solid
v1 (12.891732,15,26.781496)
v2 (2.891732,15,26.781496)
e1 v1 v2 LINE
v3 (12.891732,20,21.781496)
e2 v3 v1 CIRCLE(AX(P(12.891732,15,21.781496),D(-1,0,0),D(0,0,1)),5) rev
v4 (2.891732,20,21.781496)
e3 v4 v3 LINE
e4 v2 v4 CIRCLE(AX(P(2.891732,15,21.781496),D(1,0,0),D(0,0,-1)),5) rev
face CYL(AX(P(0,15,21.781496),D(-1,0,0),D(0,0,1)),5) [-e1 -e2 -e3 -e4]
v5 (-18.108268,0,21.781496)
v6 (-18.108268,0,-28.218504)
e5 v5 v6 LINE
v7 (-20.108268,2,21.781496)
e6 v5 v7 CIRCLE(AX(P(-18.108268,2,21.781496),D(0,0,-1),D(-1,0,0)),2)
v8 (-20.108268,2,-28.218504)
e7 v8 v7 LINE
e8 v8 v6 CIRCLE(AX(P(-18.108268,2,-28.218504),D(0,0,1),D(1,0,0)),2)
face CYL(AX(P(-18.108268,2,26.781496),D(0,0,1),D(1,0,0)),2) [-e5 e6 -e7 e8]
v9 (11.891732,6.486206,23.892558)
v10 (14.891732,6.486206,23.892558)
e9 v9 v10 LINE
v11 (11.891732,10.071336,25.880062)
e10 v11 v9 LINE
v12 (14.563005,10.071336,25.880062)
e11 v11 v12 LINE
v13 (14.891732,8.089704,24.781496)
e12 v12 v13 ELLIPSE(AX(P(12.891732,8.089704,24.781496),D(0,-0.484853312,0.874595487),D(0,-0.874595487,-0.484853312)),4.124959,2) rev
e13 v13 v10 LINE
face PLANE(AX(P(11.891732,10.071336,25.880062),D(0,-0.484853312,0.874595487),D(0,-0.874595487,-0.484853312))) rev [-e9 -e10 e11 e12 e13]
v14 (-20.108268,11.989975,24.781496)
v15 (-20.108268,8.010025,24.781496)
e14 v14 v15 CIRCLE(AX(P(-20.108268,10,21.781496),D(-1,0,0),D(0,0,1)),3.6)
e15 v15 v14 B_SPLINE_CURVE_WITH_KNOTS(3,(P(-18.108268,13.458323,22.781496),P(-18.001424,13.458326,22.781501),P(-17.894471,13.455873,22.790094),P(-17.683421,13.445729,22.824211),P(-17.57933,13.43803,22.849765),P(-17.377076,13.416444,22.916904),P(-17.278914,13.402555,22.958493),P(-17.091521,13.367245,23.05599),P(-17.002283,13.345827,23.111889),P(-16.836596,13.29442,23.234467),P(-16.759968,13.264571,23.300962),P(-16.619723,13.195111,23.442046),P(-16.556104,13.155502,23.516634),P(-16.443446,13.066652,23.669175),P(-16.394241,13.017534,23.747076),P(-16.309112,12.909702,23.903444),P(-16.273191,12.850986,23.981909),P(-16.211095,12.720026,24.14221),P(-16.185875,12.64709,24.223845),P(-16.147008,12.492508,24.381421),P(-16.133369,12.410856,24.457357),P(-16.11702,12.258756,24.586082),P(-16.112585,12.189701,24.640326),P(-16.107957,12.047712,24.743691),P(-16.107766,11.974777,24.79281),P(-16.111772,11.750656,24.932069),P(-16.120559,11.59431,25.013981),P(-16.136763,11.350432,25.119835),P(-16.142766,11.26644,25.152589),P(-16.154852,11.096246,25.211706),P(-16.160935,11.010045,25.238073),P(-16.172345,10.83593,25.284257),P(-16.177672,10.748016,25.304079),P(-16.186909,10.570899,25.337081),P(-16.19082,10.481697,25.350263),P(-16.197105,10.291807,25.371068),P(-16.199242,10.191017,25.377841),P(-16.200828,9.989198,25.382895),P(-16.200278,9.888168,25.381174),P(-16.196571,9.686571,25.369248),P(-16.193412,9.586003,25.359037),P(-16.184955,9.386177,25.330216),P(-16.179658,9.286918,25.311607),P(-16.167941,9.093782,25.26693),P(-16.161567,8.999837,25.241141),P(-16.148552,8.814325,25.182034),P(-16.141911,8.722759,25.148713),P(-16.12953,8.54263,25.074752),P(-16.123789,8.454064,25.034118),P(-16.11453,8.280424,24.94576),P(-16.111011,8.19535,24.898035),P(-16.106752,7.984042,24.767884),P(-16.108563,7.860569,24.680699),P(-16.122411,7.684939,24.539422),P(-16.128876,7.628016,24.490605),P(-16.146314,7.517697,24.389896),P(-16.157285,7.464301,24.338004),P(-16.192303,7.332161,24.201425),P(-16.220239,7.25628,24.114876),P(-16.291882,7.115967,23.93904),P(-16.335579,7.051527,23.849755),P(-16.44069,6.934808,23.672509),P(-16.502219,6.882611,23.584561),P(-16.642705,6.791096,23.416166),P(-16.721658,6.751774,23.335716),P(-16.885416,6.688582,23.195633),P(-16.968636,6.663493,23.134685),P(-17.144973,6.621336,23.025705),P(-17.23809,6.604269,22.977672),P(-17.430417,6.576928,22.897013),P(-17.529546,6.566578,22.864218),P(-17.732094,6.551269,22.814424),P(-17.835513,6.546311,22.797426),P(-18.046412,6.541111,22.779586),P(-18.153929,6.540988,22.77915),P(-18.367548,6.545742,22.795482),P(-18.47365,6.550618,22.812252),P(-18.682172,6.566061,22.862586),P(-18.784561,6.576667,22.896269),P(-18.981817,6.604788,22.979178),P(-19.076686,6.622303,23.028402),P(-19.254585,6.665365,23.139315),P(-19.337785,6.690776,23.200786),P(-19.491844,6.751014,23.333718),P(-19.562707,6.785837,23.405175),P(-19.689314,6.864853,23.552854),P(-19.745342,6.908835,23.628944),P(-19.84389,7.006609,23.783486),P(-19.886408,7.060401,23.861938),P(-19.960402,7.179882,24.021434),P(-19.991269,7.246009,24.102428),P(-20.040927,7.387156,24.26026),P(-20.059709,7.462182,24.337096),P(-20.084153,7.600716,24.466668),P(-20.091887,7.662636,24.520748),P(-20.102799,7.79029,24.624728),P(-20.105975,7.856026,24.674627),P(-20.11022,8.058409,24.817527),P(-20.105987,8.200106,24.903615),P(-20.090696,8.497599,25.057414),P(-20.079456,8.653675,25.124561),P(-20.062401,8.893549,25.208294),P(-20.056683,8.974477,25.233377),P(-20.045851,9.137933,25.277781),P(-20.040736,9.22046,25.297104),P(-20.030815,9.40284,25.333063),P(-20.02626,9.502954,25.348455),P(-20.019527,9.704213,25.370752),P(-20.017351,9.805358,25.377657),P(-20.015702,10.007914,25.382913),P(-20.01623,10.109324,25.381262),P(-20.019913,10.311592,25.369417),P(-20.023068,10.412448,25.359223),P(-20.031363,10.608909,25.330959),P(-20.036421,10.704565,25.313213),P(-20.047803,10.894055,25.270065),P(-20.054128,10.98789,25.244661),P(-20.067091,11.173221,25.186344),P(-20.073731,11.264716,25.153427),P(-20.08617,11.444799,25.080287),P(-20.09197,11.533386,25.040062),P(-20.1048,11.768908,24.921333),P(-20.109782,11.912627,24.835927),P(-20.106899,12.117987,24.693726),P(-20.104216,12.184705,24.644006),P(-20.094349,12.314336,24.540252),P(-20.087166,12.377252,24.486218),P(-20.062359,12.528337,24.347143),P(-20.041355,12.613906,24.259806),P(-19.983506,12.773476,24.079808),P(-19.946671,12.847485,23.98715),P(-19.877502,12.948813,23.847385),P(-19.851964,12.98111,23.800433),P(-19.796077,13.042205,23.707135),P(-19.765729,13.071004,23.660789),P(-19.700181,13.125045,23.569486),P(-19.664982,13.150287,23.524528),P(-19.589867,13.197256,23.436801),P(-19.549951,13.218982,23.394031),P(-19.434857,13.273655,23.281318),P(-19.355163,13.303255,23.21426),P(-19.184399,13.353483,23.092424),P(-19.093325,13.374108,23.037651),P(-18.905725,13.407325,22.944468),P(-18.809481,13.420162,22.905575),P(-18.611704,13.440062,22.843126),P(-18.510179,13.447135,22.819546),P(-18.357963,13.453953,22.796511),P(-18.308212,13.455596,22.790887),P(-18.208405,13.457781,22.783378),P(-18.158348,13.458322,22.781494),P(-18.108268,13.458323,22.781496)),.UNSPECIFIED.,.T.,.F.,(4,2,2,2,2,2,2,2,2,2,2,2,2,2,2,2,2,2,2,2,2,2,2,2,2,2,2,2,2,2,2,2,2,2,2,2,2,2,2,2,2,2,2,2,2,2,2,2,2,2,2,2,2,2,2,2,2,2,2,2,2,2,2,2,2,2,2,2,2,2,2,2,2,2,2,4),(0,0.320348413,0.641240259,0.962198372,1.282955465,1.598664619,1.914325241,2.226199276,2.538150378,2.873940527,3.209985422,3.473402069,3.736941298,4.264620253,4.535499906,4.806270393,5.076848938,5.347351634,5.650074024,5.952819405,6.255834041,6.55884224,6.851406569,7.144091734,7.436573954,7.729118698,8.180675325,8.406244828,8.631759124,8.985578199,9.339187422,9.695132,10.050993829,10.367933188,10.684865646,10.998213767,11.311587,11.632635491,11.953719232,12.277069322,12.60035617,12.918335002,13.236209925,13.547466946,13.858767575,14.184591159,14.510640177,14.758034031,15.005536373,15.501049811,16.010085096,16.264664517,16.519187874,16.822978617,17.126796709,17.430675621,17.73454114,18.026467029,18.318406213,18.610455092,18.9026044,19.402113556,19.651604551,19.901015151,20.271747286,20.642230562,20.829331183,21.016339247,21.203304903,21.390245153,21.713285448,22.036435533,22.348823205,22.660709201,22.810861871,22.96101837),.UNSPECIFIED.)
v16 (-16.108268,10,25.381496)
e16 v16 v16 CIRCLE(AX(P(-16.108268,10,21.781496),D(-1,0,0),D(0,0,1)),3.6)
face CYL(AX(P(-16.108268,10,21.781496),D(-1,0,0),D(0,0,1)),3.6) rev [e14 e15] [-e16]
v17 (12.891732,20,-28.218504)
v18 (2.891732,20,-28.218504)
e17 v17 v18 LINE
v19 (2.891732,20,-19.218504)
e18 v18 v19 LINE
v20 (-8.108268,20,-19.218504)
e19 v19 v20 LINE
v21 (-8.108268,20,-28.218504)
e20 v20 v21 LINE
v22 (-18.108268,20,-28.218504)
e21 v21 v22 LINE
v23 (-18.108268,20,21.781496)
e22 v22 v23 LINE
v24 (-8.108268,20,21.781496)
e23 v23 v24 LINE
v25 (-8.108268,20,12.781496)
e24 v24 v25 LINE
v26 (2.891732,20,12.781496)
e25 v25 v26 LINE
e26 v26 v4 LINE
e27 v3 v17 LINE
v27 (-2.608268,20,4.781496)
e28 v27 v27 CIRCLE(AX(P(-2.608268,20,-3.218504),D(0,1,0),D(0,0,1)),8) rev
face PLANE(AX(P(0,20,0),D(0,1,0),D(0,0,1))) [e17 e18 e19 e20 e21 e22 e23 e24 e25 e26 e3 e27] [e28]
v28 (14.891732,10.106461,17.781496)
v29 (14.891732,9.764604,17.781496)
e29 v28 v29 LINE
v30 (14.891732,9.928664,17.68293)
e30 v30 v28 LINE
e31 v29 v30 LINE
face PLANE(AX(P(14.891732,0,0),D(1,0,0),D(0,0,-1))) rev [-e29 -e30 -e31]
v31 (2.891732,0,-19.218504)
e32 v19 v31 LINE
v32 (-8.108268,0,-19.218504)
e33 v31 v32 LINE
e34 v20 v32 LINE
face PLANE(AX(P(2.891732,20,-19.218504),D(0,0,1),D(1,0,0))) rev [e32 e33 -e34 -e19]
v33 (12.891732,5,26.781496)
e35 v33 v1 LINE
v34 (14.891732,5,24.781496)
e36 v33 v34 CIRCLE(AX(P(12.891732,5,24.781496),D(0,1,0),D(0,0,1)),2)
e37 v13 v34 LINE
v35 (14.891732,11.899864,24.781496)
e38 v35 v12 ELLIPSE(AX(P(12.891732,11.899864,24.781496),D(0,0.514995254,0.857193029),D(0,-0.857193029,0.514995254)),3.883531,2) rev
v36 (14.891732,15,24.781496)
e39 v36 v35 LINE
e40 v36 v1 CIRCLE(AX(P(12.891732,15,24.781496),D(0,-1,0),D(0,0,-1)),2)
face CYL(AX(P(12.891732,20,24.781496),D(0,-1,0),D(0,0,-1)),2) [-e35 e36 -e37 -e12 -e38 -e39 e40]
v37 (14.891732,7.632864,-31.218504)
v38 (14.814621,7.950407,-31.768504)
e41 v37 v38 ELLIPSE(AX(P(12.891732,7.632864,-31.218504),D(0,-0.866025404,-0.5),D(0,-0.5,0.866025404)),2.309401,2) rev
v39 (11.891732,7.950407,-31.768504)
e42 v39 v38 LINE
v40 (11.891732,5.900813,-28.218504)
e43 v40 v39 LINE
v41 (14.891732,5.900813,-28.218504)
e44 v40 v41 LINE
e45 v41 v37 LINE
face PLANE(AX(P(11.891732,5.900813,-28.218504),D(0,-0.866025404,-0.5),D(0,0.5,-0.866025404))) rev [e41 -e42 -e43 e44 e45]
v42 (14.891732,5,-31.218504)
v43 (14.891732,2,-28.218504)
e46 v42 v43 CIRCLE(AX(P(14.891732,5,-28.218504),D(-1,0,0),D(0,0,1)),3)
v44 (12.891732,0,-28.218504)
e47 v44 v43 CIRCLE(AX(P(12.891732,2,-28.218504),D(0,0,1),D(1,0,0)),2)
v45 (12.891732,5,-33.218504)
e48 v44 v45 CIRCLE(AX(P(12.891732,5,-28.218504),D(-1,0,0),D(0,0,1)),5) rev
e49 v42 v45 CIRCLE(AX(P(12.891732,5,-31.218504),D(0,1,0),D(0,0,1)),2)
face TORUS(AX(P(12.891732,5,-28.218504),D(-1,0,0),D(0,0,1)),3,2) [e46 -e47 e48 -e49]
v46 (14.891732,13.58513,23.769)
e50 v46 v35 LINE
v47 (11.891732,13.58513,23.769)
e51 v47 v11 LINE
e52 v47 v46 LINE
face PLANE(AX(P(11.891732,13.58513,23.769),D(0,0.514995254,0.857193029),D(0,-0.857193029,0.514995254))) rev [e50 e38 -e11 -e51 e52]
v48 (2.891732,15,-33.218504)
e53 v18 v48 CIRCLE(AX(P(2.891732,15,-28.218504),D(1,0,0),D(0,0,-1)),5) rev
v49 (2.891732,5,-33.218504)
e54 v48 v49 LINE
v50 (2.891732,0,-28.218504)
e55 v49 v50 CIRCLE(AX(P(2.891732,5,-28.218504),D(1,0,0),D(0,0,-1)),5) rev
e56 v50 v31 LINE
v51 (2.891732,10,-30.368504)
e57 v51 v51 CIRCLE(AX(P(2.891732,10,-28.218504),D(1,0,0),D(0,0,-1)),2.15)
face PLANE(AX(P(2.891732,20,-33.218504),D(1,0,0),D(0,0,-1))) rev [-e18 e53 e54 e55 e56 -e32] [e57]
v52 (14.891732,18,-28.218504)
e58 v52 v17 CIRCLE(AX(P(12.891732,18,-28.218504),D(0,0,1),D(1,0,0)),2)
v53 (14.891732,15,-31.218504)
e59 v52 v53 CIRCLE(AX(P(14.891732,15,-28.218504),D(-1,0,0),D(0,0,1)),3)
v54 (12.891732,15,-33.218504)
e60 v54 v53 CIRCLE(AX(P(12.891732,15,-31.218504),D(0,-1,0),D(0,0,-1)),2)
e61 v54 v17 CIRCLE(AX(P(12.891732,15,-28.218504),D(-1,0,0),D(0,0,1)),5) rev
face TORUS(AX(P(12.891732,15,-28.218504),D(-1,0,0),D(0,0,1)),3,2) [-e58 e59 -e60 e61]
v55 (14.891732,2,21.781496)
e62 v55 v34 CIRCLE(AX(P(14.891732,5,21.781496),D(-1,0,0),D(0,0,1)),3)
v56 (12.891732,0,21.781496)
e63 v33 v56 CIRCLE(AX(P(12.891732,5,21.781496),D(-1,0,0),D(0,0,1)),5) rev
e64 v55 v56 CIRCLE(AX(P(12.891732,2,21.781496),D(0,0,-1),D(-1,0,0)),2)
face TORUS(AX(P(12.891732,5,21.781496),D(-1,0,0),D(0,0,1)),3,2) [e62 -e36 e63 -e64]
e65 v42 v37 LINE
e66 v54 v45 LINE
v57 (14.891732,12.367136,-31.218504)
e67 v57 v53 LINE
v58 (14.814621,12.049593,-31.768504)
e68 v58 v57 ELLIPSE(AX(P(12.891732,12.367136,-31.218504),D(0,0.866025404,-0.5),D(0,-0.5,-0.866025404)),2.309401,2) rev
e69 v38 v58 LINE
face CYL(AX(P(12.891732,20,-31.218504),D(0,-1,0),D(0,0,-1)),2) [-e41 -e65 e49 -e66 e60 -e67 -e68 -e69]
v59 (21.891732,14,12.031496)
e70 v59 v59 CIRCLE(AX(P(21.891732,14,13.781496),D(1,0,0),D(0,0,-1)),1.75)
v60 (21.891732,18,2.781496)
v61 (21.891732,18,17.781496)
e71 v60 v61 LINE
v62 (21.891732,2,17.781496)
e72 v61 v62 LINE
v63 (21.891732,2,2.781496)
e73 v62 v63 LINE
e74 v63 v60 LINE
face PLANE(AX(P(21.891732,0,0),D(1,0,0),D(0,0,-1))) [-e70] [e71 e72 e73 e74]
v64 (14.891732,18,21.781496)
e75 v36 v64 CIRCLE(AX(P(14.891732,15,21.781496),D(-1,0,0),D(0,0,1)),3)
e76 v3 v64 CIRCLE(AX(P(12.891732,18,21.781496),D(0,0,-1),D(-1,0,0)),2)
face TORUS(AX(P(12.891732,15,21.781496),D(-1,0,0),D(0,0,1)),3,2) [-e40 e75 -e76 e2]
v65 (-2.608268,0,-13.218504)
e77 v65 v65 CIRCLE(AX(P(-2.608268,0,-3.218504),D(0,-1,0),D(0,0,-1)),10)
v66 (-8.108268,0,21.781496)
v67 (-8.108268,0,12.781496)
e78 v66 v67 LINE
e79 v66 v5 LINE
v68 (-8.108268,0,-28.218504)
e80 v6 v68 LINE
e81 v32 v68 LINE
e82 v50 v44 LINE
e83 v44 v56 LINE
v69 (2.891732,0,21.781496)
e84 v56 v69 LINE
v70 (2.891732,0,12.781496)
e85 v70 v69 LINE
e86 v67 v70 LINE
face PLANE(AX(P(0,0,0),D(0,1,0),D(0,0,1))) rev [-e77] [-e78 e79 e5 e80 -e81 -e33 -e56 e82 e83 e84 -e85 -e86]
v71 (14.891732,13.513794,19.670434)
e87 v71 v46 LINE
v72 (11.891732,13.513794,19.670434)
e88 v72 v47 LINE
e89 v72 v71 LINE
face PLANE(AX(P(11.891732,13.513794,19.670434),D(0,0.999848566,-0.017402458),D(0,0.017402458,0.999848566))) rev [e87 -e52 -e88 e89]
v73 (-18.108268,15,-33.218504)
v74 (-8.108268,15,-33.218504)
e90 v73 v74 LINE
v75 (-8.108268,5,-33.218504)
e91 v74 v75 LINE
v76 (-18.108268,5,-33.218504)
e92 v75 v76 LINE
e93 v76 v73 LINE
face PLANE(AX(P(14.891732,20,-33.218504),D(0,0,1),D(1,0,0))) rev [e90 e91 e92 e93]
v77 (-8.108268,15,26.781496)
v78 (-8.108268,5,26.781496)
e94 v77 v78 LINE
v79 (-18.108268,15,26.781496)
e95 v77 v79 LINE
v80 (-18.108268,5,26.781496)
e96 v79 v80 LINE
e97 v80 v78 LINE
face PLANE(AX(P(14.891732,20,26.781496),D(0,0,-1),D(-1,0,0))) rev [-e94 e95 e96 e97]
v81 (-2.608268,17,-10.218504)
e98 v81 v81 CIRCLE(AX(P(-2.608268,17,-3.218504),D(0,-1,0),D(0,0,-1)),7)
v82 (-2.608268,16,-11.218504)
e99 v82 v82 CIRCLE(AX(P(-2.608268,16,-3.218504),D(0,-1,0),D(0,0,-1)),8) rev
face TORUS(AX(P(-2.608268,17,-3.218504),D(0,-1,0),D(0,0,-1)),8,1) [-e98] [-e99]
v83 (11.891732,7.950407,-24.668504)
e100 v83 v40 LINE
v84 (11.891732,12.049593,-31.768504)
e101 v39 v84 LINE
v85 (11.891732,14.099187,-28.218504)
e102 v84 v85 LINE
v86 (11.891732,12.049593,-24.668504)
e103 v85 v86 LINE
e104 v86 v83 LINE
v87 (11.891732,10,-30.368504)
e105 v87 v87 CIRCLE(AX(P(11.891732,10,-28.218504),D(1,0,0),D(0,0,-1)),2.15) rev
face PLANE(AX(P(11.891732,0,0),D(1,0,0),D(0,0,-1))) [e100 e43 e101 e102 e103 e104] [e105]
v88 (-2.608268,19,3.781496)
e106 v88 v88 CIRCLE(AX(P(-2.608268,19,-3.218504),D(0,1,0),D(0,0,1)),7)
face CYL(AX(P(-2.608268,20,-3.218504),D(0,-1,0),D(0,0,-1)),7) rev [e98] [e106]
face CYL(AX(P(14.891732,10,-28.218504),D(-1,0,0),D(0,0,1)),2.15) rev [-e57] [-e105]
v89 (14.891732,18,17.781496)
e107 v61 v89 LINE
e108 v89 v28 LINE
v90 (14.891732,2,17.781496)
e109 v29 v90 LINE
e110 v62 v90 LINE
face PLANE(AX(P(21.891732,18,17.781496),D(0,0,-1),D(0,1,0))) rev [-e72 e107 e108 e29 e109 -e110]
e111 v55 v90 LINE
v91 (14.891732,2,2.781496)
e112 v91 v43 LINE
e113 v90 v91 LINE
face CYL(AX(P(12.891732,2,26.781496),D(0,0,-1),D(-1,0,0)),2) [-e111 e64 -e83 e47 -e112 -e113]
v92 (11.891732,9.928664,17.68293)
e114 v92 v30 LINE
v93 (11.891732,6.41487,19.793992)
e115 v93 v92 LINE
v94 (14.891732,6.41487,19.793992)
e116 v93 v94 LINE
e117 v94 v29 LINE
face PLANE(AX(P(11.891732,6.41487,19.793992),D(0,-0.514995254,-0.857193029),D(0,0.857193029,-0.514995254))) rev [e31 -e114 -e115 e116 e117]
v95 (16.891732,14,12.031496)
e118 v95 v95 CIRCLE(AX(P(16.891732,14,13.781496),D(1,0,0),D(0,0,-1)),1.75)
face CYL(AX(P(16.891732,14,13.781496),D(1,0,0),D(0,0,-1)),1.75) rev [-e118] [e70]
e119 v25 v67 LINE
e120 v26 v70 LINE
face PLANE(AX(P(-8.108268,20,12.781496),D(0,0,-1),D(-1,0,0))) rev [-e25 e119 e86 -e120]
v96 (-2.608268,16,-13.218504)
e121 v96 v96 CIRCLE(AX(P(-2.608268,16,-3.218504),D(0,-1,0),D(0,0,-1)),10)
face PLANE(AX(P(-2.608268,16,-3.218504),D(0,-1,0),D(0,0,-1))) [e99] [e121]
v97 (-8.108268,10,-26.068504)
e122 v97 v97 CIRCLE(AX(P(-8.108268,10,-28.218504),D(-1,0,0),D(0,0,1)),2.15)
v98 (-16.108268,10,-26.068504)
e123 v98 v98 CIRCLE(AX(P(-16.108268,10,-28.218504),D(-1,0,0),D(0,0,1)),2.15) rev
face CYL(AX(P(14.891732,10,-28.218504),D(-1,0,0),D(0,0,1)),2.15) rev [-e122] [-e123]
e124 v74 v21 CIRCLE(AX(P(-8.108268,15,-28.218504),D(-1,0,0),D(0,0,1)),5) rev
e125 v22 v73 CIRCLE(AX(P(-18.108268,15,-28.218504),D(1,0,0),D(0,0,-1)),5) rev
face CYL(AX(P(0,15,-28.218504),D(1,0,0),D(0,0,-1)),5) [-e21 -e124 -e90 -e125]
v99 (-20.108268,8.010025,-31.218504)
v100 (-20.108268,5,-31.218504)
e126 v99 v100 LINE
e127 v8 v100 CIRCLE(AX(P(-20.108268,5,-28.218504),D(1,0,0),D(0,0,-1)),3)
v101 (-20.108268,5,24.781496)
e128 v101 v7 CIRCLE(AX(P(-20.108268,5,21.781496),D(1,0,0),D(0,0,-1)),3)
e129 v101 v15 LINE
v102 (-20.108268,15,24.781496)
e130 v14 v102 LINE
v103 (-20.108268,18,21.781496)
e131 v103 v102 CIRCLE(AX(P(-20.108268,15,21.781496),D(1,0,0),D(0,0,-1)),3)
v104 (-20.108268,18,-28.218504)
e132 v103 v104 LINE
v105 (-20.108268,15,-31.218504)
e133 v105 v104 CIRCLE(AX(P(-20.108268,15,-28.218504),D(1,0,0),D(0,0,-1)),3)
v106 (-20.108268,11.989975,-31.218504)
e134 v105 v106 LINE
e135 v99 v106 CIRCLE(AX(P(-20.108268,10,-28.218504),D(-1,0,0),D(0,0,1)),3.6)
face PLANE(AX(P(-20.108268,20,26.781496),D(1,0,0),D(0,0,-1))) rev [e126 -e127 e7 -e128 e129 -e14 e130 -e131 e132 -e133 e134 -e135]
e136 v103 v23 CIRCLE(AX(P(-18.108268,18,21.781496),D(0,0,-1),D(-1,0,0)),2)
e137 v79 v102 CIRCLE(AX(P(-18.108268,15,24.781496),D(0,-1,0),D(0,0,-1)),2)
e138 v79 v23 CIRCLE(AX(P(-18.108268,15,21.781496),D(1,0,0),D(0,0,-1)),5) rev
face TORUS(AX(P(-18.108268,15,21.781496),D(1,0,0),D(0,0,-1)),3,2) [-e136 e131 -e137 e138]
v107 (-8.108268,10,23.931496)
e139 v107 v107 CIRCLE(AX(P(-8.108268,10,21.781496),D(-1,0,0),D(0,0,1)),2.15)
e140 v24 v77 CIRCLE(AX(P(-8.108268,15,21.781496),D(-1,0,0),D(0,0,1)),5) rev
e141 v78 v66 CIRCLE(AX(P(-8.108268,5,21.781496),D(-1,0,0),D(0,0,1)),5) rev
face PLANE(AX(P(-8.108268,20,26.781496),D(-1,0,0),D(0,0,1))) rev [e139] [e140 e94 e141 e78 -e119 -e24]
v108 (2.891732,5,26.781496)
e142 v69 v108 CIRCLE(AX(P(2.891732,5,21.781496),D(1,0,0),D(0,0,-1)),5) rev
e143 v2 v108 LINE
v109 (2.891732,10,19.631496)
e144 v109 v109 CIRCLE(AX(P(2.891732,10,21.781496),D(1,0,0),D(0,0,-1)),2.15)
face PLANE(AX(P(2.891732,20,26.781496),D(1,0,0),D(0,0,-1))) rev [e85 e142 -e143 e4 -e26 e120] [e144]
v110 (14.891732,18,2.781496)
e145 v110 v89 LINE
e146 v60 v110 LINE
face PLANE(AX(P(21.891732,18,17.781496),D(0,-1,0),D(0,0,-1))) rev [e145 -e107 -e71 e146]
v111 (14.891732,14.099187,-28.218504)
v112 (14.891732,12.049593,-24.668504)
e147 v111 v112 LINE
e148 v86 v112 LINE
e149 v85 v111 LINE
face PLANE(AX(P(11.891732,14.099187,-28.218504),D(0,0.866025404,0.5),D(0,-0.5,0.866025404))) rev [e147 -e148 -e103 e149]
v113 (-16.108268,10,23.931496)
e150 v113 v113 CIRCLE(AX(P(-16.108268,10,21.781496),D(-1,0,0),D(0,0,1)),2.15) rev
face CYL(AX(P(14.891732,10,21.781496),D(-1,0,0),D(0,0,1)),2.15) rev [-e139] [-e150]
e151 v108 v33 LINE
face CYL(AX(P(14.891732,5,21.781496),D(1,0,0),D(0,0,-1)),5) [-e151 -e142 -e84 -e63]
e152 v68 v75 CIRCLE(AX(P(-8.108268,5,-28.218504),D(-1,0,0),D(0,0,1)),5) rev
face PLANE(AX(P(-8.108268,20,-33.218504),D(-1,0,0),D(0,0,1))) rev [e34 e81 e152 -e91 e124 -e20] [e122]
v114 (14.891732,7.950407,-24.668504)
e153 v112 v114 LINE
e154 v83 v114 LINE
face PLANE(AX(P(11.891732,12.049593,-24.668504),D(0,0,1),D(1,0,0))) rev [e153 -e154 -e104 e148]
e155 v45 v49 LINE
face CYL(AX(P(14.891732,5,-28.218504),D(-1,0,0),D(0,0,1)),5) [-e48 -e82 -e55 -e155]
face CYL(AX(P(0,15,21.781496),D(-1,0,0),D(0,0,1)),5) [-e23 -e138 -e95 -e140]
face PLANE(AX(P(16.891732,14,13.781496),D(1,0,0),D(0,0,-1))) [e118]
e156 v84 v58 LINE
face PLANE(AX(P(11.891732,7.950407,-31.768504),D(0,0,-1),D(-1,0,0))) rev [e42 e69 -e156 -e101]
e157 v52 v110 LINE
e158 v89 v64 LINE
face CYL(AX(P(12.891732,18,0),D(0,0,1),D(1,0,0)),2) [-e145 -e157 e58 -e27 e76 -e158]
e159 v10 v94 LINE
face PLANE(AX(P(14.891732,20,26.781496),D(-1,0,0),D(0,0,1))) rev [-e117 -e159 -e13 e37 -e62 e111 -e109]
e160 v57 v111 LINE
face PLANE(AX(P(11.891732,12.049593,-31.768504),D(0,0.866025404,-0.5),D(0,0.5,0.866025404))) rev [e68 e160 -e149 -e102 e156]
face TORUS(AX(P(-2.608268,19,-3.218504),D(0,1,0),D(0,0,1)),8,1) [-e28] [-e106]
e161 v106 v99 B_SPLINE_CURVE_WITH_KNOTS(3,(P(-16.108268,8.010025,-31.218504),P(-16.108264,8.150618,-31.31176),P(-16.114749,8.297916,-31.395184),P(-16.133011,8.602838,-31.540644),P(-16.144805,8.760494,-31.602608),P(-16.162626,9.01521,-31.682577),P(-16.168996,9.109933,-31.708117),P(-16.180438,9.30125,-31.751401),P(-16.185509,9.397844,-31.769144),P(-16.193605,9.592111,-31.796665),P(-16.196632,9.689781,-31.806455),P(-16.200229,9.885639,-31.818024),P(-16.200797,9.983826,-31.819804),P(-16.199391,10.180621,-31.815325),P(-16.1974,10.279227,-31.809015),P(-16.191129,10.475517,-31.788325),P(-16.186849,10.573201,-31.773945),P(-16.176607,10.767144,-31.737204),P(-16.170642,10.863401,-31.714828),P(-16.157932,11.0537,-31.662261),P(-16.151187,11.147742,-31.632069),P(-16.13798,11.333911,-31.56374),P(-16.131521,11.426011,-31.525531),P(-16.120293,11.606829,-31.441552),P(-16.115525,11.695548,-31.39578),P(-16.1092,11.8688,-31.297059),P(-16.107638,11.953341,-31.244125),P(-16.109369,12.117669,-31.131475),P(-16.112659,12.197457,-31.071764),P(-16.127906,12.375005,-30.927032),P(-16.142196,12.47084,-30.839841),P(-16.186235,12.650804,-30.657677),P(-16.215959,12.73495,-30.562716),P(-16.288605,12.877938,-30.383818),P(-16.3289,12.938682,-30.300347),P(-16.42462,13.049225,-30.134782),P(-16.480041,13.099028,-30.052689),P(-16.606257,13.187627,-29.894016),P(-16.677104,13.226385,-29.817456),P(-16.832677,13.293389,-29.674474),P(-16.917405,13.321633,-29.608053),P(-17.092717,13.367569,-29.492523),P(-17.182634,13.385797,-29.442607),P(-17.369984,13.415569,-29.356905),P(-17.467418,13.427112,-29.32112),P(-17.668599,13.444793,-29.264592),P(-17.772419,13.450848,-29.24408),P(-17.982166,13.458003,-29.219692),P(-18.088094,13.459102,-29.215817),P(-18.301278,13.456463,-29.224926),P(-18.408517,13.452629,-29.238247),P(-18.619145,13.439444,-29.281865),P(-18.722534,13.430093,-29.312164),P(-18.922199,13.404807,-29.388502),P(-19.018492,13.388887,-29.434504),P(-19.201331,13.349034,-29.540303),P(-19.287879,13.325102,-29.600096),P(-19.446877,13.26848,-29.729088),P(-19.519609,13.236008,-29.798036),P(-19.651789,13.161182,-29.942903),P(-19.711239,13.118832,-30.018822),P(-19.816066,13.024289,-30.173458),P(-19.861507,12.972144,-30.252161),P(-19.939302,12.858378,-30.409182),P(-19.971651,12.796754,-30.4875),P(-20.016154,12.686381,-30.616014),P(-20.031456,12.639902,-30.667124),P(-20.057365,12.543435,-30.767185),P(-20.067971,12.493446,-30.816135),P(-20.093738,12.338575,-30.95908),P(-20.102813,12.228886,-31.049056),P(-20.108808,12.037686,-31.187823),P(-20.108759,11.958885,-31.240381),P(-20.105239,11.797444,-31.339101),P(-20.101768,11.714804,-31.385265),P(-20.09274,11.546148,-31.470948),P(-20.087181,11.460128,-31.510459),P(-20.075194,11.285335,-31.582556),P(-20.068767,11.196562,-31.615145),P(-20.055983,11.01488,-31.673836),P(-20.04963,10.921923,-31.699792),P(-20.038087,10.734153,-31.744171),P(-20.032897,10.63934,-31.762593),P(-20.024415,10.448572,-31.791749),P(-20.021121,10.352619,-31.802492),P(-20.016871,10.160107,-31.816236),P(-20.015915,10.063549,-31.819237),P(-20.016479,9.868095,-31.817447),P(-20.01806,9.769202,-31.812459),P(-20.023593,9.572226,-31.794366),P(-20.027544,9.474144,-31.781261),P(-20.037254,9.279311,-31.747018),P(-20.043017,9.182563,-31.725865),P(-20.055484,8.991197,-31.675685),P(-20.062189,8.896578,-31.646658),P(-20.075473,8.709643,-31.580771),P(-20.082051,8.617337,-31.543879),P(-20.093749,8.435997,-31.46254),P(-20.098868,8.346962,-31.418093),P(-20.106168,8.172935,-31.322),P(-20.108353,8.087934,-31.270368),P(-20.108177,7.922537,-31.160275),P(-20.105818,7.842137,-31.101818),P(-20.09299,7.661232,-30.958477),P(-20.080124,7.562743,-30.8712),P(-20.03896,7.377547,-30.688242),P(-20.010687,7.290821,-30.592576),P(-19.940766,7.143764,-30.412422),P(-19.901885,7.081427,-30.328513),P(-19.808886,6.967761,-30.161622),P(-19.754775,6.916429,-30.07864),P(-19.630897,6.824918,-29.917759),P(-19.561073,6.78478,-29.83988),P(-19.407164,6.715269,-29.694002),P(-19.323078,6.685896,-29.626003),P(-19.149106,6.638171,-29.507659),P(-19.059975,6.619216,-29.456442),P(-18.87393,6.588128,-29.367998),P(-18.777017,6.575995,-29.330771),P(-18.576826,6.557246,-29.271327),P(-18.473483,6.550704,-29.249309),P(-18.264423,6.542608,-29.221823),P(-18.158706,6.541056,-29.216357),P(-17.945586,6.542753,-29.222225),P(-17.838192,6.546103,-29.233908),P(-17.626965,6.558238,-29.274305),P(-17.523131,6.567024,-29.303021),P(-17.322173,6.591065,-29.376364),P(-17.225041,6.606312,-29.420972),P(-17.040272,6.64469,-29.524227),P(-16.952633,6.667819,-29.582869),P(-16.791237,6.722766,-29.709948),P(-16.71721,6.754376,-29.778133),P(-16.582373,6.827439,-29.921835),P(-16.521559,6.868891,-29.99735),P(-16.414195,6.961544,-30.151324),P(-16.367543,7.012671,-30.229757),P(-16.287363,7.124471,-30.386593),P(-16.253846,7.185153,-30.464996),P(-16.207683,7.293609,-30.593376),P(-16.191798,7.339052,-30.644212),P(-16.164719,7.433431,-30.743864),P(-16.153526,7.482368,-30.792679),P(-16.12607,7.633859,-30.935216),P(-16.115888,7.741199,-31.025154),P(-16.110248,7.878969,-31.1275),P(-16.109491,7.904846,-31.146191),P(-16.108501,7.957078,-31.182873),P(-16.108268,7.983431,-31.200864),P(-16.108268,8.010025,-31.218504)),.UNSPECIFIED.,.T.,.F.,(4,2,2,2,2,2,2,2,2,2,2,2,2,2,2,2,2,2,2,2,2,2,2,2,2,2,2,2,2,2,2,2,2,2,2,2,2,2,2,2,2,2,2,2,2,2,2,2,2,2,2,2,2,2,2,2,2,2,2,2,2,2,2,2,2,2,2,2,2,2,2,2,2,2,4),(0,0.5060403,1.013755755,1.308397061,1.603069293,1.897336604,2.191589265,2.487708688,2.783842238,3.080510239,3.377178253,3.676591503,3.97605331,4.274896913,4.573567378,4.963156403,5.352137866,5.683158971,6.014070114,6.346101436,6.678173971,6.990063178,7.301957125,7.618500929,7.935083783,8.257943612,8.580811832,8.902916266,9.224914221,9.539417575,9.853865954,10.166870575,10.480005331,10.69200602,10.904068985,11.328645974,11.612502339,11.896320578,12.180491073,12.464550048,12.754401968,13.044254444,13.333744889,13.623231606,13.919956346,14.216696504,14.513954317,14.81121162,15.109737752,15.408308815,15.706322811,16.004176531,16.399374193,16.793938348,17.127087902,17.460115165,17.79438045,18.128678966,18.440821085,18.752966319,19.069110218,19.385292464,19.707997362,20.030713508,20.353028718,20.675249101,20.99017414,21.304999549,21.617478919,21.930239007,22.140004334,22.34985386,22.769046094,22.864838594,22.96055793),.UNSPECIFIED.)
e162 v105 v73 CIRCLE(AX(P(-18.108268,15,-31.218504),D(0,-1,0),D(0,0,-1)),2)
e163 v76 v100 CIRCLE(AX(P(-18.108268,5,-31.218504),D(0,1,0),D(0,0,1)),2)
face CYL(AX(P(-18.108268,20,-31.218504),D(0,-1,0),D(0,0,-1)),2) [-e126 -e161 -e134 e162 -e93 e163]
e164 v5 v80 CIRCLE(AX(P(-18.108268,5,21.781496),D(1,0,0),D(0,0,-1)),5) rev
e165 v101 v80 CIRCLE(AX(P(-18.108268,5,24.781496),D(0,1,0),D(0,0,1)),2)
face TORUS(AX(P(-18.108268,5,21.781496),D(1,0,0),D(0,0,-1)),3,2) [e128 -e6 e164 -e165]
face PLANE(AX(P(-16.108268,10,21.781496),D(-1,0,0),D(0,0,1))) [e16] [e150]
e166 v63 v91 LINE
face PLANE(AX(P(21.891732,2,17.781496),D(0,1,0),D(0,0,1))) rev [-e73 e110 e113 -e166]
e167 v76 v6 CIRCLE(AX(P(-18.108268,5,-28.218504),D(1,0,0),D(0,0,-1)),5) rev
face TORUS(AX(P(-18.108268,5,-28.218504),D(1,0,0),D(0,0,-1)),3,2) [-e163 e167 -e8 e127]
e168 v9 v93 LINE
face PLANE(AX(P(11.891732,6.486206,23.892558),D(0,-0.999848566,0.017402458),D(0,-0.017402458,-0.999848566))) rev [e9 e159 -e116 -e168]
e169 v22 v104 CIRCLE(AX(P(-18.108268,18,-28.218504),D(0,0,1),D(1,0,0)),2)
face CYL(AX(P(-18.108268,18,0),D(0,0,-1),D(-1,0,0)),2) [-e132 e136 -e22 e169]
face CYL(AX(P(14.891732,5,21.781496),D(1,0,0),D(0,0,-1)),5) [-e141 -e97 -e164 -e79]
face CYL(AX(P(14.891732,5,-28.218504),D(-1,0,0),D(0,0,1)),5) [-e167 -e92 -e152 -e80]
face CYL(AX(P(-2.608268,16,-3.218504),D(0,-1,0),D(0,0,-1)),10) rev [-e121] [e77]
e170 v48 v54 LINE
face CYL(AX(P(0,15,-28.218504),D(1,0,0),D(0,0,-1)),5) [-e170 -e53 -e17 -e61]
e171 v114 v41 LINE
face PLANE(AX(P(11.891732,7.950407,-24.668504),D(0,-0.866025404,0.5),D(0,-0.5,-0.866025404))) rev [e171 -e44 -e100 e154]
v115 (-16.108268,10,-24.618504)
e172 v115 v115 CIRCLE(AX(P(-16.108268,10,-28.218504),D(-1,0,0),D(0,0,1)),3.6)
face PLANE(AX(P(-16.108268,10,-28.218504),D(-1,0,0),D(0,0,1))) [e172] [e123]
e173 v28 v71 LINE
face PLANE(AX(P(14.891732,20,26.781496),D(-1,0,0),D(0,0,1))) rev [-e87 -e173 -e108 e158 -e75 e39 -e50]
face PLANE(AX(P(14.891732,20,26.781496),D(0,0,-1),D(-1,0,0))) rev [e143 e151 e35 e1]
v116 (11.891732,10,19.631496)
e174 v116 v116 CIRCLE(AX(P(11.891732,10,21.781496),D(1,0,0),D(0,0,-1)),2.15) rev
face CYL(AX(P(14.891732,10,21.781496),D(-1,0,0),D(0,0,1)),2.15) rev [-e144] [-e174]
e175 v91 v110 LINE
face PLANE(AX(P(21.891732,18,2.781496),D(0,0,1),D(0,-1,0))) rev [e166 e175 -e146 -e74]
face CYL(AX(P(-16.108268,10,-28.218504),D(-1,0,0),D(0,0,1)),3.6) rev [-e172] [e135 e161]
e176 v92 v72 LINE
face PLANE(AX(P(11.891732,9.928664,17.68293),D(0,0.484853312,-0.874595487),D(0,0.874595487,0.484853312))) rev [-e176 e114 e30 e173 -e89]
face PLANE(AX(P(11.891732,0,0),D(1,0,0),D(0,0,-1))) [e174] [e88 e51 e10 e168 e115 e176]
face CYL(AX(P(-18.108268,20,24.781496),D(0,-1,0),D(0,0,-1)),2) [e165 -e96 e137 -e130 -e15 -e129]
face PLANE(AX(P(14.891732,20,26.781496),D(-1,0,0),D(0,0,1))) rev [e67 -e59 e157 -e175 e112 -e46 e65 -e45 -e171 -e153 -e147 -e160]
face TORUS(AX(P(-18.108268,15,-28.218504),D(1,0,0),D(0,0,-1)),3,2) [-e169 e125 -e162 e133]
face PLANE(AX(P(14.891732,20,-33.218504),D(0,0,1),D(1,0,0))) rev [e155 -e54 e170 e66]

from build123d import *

# Parameters (mm, degrees)
SKETCH1_W           = 35
SKETCH1_H           = 60
BOSS_EXTRUDE1_DEPTH = 20
SKETCH2_R           = 10
CUT_EXTRUDE1_DEPTH  = 16
SKETCH4_R           = 7
CUT_EXTRUDE2_DEPTH  = 42.997755111
FILLET1_R           = 2
SKETCH5_W           = 11
SKETCH5_H           = 14
CUT_EXTRUDE3_DEPTH  = 44.678500826
SKETCH6_R           = 2.15
CUT_EXTRUDE4_DEPTH  = 53.234749007
FILLET3_R           = 5
FILLET4_R           = 5
FILLET7_R           = 1
SKETCH9_W           = 15
SKETCH9_H           = 16
BOSS_EXTRUDE3_DEPTH = 7
SKETCH10_R          = 1.75
CUT_EXTRUDE6_DEPTH  = 5
SKETCH12_R          = 3.6
CUT_EXTRUDE7_DEPTH  = 4
CUT_EXTRUDE8_DEPTH  = 3


with BuildPart() as part:
    # Sketch1 → Boss-Extrude1 (new body)
    with BuildSketch(Plane(origin=(0, 0, 0), x_dir=(1, 0, 0), z_dir=(0, 1, 0))):
        with Locations((-2.608267717, 3.218503937)):
            Rectangle(SKETCH1_W, SKETCH1_H)
    extrude(amount=BOSS_EXTRUDE1_DEPTH)

    # Sketch2 → Cut-Extrude1 (cut)
    with BuildSketch(Plane.XZ):
        with Locations(Location((-2.608267717, -3.218503937, 0), (0, 0, 270))):
            Circle(SKETCH2_R)
    extrude(amount=-CUT_EXTRUDE1_DEPTH, mode=Mode.SUBTRACT)

    # Sketch4 → Cut-Extrude2 (cut, through all)
    with BuildSketch(Plane.XZ.offset(-16)):
        with Locations(Location((-2.608267717, -3.218503937, 0), (0, 0, 270))):
            Circle(SKETCH4_R)
    extrude(amount=-CUT_EXTRUDE2_DEPTH, mode=Mode.SUBTRACT)

    # Fillet1
    fillet1_edges = [part.edges().sort_by_distance(p)[0] for p in [
        (-20.108267717, 20, -3.218503937),
        (14.891732283, 20, -3.218503937),
        (-20.108267717, 0, -3.218503937),
        (14.891732283, 0, -3.218503937),
        (14.891732283, 10, 26.781496063),
        (-20.108267717, 10, 26.781496063),
        (-20.108267717, 10, -33.218503937),
        (14.891732283, 10, -33.218503937),
    ]]
    fillet(fillet1_edges, radius=FILLET1_R)

    # Sketch5 → Cut-Extrude3 (cut, through all)
    with BuildSketch(Plane.XZ):
        with Locations((-2.608267717, 19.781496063)):
            Rectangle(SKETCH5_W, SKETCH5_H)
        with Locations((-2.608267717, -26.218503937)):
            Rectangle(SKETCH5_W, SKETCH5_H)
    extrude(amount=-CUT_EXTRUDE3_DEPTH, mode=Mode.SUBTRACT)

    # Sketch6 → Cut-Extrude4 (cut, through all)
    with BuildSketch(Plane.ZY.offset(20.108267717)):
        with Locations((-28.218503937, 10)):
            Circle(SKETCH6_R)
        with Locations((21.781496063, 10)):
            Circle(SKETCH6_R)
    extrude(amount=-CUT_EXTRUDE4_DEPTH, mode=Mode.SUBTRACT)

    # Fillet3
    # the kernel refuses this fillet: 5 mm, written as the material it takes off along each edge
    with BuildSketch(Plane(origin=(-20.108267717, 15, 21.781496063), x_dir=(0, 0, 1), z_dir=(0, -1, 0))) as fillet3_piece_1:
        with BuildLine():
            CenterArc((3, -2), 2, 0, 90)
            Line((5, -2), (5, 0))
            Line((5, 0), (3, 0))
        make_face()
    revolve(axis=Axis((-20.108267717, 15, 21.781496063), (-1, 0, 0)), revolution_arc=90, mode=Mode.SUBTRACT)
    with BuildSketch(Plane(origin=(-20.108267717, 5, 21.781496063), x_dir=(0, -1, 0), z_dir=(0, 0, -1))) as fillet3_piece_2:
        with BuildLine():
            CenterArc((3, -2), 2, 0, 90)
            Line((5, -2), (5, 0))
            Line((5, 0), (3, 0))
        make_face()
    revolve(axis=Axis((-20.108267717, 5, 21.781496063), (-1, 0, 0)), revolution_arc=90, mode=Mode.SUBTRACT)
    with BuildSketch(Plane(origin=(14.891732283, 15, 21.781496063), x_dir=(0, 1, 0), z_dir=(0, 0, -1))) as fillet3_piece_3:
        with BuildLine():
            CenterArc((3, -2), 2, 0, 90)
            Line((5, -2), (5, 0))
            Line((5, 0), (3, 0))
        make_face()
    revolve(axis=Axis((14.891732283, 15, 21.781496063), (1, 0, 0)), revolution_arc=90, mode=Mode.SUBTRACT)
    with BuildSketch(Plane(origin=(14.891732283, 5, 21.781496063), x_dir=(0, 0, 1), z_dir=(0, 1, 0))) as fillet3_piece_4:
        with BuildLine():
            CenterArc((3, -2), 2, 0, 90)
            Line((5, -2), (5, 0))
            Line((5, 0), (3, 0))
        make_face()
    revolve(axis=Axis((14.891732283, 5, 21.781496063), (1, 0, 0)), revolution_arc=90, mode=Mode.SUBTRACT)
    with BuildSketch(Plane(origin=(4.391732283, 20, 26.781496063), x_dir=(0, 0, -1), z_dir=(-1, 0, 0)), Plane(origin=(14.891732283, 0, 26.781496063), x_dir=(0, 1, 0), z_dir=(-1, 0, 0))) as fillet3_piece_5:
        with BuildLine():
            CenterArc((FILLET3_R, FILLET3_R), FILLET3_R, 180, 90)
            Line((0, FILLET3_R), (0, 0))
            Line((0, 0), (FILLET3_R, 0))
        make_face()
    extrude(amount=24.5, mode=Mode.SUBTRACT)
    with BuildSketch(Plane(origin=(4.391732283, 0, 26.781496063), x_dir=(0, 0, -1), z_dir=(-1, 0, 0)), Plane(origin=(14.891732283, 20, 26.781496063), x_dir=(0, -1, 0), z_dir=(-1, 0, 0))) as fillet3_piece_6:
        with BuildLine():
            CenterArc((FILLET3_R, -FILLET3_R), FILLET3_R, 90, 90)
            Line((0, -FILLET3_R), (0, 0))
            Line((0, 0), (FILLET3_R, 0))
        make_face()
    extrude(amount=24.5, mode=Mode.SUBTRACT)

    # Fillet4
    # the kernel refuses this fillet: 5 mm, written as the material it takes off along each edge
    with BuildSketch(Plane(origin=(-20.108267717, 15, -28.218503937), x_dir=(0, 1, 0), z_dir=(0, 0, 1))) as fillet4_piece_1:
        with BuildLine():
            CenterArc((3, -2), 2, 0, 90)
            Line((5, -2), (5, 0))
            Line((5, 0), (3, 0))
        make_face()
    revolve(axis=Axis((-20.108267717, 15, -28.218503937), (-1, 0, 0)), revolution_arc=90, mode=Mode.SUBTRACT)
    with BuildSketch(Plane(origin=(-20.108267717, 5, -28.218503937), x_dir=(0, 0, -1), z_dir=(0, 1, 0))) as fillet4_piece_2:
        with BuildLine():
            CenterArc((3, -2), 2, 0, 90)
            Line((5, -2), (5, 0))
            Line((5, 0), (3, 0))
        make_face()
    revolve(axis=Axis((-20.108267717, 5, -28.218503937), (-1, 0, 0)), revolution_arc=90, mode=Mode.SUBTRACT)
    with BuildSketch(Plane(origin=(14.891732283, 15, -28.218503937), x_dir=(0, 0, -1), z_dir=(0, -1, 0))) as fillet4_piece_3:
        with BuildLine():
            CenterArc((3, -2), 2, 0, 90)
            Line((5, -2), (5, 0))
            Line((5, 0), (3, 0))
        make_face()
    revolve(axis=Axis((14.891732283, 15, -28.218503937), (1, 0, 0)), revolution_arc=90, mode=Mode.SUBTRACT)
    with BuildSketch(Plane(origin=(14.891732283, 5, -28.218503937), x_dir=(0, -1, 0), z_dir=(0, 0, 1))) as fillet4_piece_4:
        with BuildLine():
            CenterArc((3, -2), 2, 0, 90)
            Line((5, -2), (5, 0))
            Line((5, 0), (3, 0))
        make_face()
    revolve(axis=Axis((14.891732283, 5, -28.218503937), (1, 0, 0)), revolution_arc=90, mode=Mode.SUBTRACT)
    with BuildSketch(Plane(origin=(-9.608267717, 0, -33.218503937), x_dir=(0, 1, 0), z_dir=(1, 0, 0)), Plane(origin=(-20.108267717, 0, -33.218503937), x_dir=(0, 1, 0), z_dir=(1, 0, 0))) as fillet4_piece_5:
        with BuildLine():
            CenterArc((FILLET4_R, FILLET4_R), FILLET4_R, 180, 90)
            Line((0, FILLET4_R), (0, 0))
            Line((0, 0), (FILLET4_R, 0))
        make_face()
    extrude(amount=24.5, mode=Mode.SUBTRACT)
    with BuildSketch(Plane(origin=(-9.608267717, 20, -33.218503937), x_dir=(0, -1, 0), z_dir=(1, 0, 0)), Plane(origin=(-20.108267717, 20, -33.218503937), x_dir=(0, -1, 0), z_dir=(1, 0, 0))) as fillet4_piece_6:
        with BuildLine():
            CenterArc((FILLET4_R, -FILLET4_R), FILLET4_R, 90, 90)
            Line((0, -FILLET4_R), (0, 0))
            Line((0, 0), (FILLET4_R, 0))
        make_face()
    extrude(amount=24.5, mode=Mode.SUBTRACT)

    # Fillet7
    fillet7_edges = [part.edges().sort_by_distance(p)[0] for p in [
        (-2.608267717, 20, 3.781496063),
        (-2.608267717, 16, 3.781496063),
    ]]
    fillet(fillet7_edges, radius=FILLET7_R)

    # Sketch9 → Boss-Extrude3 (add)
    with BuildSketch(Plane(origin=(14.891732283, 0, 0), x_dir=(0, 0, -1), z_dir=(1, 0, 0))):
        with Locations((-10.281496063, 10)):
            Rectangle(SKETCH9_W, SKETCH9_H)
    extrude(amount=BOSS_EXTRUDE3_DEPTH)

    # Sketch10 → Cut-Extrude6 (cut)
    with BuildSketch(Plane(origin=(21.891732283, 0, 0), x_dir=(0, 0, -1), z_dir=(1, 0, 0))):
        with Locations((-13.781496063, 14)):
            Circle(SKETCH10_R)
    extrude(amount=-CUT_EXTRUDE6_DEPTH, mode=Mode.SUBTRACT)

    # Sketch12 → Cut-Extrude7 (cut)
    with BuildSketch(Plane.ZY.offset(20.108267717)):
        with Locations((-28.218503937, 10)):
            Circle(SKETCH12_R)
        with Locations((21.781496063, 10)):
            Circle(SKETCH12_R)
    extrude(amount=-CUT_EXTRUDE7_DEPTH, mode=Mode.SUBTRACT)

    # Sketch13 → Cut-Extrude8 (cut)
    with BuildSketch(Plane(origin=(14.891732283, 0, 0), x_dir=(0, 0, -1), z_dir=(1, 0, 0))):
        Polygon((-19.793991712, 6.414869628), (-17.682929909, 9.928664072), (-19.67043426, 13.513794445), (-23.769000414, 13.585130372), (-25.880062217, 10.071335928), (-23.892557866, 6.486205555), align=None)
        Polygon((28.218503937, 5.900813089), (31.768503937, 7.950406544), (31.768503937, 12.049593456), (28.218503937, 14.099186911), (24.668503937, 12.049593456), (24.668503937, 7.950406544), align=None)
    extrude(amount=-CUT_EXTRUDE8_DEPTH, mode=Mode.SUBTRACT)


solid = part.part
